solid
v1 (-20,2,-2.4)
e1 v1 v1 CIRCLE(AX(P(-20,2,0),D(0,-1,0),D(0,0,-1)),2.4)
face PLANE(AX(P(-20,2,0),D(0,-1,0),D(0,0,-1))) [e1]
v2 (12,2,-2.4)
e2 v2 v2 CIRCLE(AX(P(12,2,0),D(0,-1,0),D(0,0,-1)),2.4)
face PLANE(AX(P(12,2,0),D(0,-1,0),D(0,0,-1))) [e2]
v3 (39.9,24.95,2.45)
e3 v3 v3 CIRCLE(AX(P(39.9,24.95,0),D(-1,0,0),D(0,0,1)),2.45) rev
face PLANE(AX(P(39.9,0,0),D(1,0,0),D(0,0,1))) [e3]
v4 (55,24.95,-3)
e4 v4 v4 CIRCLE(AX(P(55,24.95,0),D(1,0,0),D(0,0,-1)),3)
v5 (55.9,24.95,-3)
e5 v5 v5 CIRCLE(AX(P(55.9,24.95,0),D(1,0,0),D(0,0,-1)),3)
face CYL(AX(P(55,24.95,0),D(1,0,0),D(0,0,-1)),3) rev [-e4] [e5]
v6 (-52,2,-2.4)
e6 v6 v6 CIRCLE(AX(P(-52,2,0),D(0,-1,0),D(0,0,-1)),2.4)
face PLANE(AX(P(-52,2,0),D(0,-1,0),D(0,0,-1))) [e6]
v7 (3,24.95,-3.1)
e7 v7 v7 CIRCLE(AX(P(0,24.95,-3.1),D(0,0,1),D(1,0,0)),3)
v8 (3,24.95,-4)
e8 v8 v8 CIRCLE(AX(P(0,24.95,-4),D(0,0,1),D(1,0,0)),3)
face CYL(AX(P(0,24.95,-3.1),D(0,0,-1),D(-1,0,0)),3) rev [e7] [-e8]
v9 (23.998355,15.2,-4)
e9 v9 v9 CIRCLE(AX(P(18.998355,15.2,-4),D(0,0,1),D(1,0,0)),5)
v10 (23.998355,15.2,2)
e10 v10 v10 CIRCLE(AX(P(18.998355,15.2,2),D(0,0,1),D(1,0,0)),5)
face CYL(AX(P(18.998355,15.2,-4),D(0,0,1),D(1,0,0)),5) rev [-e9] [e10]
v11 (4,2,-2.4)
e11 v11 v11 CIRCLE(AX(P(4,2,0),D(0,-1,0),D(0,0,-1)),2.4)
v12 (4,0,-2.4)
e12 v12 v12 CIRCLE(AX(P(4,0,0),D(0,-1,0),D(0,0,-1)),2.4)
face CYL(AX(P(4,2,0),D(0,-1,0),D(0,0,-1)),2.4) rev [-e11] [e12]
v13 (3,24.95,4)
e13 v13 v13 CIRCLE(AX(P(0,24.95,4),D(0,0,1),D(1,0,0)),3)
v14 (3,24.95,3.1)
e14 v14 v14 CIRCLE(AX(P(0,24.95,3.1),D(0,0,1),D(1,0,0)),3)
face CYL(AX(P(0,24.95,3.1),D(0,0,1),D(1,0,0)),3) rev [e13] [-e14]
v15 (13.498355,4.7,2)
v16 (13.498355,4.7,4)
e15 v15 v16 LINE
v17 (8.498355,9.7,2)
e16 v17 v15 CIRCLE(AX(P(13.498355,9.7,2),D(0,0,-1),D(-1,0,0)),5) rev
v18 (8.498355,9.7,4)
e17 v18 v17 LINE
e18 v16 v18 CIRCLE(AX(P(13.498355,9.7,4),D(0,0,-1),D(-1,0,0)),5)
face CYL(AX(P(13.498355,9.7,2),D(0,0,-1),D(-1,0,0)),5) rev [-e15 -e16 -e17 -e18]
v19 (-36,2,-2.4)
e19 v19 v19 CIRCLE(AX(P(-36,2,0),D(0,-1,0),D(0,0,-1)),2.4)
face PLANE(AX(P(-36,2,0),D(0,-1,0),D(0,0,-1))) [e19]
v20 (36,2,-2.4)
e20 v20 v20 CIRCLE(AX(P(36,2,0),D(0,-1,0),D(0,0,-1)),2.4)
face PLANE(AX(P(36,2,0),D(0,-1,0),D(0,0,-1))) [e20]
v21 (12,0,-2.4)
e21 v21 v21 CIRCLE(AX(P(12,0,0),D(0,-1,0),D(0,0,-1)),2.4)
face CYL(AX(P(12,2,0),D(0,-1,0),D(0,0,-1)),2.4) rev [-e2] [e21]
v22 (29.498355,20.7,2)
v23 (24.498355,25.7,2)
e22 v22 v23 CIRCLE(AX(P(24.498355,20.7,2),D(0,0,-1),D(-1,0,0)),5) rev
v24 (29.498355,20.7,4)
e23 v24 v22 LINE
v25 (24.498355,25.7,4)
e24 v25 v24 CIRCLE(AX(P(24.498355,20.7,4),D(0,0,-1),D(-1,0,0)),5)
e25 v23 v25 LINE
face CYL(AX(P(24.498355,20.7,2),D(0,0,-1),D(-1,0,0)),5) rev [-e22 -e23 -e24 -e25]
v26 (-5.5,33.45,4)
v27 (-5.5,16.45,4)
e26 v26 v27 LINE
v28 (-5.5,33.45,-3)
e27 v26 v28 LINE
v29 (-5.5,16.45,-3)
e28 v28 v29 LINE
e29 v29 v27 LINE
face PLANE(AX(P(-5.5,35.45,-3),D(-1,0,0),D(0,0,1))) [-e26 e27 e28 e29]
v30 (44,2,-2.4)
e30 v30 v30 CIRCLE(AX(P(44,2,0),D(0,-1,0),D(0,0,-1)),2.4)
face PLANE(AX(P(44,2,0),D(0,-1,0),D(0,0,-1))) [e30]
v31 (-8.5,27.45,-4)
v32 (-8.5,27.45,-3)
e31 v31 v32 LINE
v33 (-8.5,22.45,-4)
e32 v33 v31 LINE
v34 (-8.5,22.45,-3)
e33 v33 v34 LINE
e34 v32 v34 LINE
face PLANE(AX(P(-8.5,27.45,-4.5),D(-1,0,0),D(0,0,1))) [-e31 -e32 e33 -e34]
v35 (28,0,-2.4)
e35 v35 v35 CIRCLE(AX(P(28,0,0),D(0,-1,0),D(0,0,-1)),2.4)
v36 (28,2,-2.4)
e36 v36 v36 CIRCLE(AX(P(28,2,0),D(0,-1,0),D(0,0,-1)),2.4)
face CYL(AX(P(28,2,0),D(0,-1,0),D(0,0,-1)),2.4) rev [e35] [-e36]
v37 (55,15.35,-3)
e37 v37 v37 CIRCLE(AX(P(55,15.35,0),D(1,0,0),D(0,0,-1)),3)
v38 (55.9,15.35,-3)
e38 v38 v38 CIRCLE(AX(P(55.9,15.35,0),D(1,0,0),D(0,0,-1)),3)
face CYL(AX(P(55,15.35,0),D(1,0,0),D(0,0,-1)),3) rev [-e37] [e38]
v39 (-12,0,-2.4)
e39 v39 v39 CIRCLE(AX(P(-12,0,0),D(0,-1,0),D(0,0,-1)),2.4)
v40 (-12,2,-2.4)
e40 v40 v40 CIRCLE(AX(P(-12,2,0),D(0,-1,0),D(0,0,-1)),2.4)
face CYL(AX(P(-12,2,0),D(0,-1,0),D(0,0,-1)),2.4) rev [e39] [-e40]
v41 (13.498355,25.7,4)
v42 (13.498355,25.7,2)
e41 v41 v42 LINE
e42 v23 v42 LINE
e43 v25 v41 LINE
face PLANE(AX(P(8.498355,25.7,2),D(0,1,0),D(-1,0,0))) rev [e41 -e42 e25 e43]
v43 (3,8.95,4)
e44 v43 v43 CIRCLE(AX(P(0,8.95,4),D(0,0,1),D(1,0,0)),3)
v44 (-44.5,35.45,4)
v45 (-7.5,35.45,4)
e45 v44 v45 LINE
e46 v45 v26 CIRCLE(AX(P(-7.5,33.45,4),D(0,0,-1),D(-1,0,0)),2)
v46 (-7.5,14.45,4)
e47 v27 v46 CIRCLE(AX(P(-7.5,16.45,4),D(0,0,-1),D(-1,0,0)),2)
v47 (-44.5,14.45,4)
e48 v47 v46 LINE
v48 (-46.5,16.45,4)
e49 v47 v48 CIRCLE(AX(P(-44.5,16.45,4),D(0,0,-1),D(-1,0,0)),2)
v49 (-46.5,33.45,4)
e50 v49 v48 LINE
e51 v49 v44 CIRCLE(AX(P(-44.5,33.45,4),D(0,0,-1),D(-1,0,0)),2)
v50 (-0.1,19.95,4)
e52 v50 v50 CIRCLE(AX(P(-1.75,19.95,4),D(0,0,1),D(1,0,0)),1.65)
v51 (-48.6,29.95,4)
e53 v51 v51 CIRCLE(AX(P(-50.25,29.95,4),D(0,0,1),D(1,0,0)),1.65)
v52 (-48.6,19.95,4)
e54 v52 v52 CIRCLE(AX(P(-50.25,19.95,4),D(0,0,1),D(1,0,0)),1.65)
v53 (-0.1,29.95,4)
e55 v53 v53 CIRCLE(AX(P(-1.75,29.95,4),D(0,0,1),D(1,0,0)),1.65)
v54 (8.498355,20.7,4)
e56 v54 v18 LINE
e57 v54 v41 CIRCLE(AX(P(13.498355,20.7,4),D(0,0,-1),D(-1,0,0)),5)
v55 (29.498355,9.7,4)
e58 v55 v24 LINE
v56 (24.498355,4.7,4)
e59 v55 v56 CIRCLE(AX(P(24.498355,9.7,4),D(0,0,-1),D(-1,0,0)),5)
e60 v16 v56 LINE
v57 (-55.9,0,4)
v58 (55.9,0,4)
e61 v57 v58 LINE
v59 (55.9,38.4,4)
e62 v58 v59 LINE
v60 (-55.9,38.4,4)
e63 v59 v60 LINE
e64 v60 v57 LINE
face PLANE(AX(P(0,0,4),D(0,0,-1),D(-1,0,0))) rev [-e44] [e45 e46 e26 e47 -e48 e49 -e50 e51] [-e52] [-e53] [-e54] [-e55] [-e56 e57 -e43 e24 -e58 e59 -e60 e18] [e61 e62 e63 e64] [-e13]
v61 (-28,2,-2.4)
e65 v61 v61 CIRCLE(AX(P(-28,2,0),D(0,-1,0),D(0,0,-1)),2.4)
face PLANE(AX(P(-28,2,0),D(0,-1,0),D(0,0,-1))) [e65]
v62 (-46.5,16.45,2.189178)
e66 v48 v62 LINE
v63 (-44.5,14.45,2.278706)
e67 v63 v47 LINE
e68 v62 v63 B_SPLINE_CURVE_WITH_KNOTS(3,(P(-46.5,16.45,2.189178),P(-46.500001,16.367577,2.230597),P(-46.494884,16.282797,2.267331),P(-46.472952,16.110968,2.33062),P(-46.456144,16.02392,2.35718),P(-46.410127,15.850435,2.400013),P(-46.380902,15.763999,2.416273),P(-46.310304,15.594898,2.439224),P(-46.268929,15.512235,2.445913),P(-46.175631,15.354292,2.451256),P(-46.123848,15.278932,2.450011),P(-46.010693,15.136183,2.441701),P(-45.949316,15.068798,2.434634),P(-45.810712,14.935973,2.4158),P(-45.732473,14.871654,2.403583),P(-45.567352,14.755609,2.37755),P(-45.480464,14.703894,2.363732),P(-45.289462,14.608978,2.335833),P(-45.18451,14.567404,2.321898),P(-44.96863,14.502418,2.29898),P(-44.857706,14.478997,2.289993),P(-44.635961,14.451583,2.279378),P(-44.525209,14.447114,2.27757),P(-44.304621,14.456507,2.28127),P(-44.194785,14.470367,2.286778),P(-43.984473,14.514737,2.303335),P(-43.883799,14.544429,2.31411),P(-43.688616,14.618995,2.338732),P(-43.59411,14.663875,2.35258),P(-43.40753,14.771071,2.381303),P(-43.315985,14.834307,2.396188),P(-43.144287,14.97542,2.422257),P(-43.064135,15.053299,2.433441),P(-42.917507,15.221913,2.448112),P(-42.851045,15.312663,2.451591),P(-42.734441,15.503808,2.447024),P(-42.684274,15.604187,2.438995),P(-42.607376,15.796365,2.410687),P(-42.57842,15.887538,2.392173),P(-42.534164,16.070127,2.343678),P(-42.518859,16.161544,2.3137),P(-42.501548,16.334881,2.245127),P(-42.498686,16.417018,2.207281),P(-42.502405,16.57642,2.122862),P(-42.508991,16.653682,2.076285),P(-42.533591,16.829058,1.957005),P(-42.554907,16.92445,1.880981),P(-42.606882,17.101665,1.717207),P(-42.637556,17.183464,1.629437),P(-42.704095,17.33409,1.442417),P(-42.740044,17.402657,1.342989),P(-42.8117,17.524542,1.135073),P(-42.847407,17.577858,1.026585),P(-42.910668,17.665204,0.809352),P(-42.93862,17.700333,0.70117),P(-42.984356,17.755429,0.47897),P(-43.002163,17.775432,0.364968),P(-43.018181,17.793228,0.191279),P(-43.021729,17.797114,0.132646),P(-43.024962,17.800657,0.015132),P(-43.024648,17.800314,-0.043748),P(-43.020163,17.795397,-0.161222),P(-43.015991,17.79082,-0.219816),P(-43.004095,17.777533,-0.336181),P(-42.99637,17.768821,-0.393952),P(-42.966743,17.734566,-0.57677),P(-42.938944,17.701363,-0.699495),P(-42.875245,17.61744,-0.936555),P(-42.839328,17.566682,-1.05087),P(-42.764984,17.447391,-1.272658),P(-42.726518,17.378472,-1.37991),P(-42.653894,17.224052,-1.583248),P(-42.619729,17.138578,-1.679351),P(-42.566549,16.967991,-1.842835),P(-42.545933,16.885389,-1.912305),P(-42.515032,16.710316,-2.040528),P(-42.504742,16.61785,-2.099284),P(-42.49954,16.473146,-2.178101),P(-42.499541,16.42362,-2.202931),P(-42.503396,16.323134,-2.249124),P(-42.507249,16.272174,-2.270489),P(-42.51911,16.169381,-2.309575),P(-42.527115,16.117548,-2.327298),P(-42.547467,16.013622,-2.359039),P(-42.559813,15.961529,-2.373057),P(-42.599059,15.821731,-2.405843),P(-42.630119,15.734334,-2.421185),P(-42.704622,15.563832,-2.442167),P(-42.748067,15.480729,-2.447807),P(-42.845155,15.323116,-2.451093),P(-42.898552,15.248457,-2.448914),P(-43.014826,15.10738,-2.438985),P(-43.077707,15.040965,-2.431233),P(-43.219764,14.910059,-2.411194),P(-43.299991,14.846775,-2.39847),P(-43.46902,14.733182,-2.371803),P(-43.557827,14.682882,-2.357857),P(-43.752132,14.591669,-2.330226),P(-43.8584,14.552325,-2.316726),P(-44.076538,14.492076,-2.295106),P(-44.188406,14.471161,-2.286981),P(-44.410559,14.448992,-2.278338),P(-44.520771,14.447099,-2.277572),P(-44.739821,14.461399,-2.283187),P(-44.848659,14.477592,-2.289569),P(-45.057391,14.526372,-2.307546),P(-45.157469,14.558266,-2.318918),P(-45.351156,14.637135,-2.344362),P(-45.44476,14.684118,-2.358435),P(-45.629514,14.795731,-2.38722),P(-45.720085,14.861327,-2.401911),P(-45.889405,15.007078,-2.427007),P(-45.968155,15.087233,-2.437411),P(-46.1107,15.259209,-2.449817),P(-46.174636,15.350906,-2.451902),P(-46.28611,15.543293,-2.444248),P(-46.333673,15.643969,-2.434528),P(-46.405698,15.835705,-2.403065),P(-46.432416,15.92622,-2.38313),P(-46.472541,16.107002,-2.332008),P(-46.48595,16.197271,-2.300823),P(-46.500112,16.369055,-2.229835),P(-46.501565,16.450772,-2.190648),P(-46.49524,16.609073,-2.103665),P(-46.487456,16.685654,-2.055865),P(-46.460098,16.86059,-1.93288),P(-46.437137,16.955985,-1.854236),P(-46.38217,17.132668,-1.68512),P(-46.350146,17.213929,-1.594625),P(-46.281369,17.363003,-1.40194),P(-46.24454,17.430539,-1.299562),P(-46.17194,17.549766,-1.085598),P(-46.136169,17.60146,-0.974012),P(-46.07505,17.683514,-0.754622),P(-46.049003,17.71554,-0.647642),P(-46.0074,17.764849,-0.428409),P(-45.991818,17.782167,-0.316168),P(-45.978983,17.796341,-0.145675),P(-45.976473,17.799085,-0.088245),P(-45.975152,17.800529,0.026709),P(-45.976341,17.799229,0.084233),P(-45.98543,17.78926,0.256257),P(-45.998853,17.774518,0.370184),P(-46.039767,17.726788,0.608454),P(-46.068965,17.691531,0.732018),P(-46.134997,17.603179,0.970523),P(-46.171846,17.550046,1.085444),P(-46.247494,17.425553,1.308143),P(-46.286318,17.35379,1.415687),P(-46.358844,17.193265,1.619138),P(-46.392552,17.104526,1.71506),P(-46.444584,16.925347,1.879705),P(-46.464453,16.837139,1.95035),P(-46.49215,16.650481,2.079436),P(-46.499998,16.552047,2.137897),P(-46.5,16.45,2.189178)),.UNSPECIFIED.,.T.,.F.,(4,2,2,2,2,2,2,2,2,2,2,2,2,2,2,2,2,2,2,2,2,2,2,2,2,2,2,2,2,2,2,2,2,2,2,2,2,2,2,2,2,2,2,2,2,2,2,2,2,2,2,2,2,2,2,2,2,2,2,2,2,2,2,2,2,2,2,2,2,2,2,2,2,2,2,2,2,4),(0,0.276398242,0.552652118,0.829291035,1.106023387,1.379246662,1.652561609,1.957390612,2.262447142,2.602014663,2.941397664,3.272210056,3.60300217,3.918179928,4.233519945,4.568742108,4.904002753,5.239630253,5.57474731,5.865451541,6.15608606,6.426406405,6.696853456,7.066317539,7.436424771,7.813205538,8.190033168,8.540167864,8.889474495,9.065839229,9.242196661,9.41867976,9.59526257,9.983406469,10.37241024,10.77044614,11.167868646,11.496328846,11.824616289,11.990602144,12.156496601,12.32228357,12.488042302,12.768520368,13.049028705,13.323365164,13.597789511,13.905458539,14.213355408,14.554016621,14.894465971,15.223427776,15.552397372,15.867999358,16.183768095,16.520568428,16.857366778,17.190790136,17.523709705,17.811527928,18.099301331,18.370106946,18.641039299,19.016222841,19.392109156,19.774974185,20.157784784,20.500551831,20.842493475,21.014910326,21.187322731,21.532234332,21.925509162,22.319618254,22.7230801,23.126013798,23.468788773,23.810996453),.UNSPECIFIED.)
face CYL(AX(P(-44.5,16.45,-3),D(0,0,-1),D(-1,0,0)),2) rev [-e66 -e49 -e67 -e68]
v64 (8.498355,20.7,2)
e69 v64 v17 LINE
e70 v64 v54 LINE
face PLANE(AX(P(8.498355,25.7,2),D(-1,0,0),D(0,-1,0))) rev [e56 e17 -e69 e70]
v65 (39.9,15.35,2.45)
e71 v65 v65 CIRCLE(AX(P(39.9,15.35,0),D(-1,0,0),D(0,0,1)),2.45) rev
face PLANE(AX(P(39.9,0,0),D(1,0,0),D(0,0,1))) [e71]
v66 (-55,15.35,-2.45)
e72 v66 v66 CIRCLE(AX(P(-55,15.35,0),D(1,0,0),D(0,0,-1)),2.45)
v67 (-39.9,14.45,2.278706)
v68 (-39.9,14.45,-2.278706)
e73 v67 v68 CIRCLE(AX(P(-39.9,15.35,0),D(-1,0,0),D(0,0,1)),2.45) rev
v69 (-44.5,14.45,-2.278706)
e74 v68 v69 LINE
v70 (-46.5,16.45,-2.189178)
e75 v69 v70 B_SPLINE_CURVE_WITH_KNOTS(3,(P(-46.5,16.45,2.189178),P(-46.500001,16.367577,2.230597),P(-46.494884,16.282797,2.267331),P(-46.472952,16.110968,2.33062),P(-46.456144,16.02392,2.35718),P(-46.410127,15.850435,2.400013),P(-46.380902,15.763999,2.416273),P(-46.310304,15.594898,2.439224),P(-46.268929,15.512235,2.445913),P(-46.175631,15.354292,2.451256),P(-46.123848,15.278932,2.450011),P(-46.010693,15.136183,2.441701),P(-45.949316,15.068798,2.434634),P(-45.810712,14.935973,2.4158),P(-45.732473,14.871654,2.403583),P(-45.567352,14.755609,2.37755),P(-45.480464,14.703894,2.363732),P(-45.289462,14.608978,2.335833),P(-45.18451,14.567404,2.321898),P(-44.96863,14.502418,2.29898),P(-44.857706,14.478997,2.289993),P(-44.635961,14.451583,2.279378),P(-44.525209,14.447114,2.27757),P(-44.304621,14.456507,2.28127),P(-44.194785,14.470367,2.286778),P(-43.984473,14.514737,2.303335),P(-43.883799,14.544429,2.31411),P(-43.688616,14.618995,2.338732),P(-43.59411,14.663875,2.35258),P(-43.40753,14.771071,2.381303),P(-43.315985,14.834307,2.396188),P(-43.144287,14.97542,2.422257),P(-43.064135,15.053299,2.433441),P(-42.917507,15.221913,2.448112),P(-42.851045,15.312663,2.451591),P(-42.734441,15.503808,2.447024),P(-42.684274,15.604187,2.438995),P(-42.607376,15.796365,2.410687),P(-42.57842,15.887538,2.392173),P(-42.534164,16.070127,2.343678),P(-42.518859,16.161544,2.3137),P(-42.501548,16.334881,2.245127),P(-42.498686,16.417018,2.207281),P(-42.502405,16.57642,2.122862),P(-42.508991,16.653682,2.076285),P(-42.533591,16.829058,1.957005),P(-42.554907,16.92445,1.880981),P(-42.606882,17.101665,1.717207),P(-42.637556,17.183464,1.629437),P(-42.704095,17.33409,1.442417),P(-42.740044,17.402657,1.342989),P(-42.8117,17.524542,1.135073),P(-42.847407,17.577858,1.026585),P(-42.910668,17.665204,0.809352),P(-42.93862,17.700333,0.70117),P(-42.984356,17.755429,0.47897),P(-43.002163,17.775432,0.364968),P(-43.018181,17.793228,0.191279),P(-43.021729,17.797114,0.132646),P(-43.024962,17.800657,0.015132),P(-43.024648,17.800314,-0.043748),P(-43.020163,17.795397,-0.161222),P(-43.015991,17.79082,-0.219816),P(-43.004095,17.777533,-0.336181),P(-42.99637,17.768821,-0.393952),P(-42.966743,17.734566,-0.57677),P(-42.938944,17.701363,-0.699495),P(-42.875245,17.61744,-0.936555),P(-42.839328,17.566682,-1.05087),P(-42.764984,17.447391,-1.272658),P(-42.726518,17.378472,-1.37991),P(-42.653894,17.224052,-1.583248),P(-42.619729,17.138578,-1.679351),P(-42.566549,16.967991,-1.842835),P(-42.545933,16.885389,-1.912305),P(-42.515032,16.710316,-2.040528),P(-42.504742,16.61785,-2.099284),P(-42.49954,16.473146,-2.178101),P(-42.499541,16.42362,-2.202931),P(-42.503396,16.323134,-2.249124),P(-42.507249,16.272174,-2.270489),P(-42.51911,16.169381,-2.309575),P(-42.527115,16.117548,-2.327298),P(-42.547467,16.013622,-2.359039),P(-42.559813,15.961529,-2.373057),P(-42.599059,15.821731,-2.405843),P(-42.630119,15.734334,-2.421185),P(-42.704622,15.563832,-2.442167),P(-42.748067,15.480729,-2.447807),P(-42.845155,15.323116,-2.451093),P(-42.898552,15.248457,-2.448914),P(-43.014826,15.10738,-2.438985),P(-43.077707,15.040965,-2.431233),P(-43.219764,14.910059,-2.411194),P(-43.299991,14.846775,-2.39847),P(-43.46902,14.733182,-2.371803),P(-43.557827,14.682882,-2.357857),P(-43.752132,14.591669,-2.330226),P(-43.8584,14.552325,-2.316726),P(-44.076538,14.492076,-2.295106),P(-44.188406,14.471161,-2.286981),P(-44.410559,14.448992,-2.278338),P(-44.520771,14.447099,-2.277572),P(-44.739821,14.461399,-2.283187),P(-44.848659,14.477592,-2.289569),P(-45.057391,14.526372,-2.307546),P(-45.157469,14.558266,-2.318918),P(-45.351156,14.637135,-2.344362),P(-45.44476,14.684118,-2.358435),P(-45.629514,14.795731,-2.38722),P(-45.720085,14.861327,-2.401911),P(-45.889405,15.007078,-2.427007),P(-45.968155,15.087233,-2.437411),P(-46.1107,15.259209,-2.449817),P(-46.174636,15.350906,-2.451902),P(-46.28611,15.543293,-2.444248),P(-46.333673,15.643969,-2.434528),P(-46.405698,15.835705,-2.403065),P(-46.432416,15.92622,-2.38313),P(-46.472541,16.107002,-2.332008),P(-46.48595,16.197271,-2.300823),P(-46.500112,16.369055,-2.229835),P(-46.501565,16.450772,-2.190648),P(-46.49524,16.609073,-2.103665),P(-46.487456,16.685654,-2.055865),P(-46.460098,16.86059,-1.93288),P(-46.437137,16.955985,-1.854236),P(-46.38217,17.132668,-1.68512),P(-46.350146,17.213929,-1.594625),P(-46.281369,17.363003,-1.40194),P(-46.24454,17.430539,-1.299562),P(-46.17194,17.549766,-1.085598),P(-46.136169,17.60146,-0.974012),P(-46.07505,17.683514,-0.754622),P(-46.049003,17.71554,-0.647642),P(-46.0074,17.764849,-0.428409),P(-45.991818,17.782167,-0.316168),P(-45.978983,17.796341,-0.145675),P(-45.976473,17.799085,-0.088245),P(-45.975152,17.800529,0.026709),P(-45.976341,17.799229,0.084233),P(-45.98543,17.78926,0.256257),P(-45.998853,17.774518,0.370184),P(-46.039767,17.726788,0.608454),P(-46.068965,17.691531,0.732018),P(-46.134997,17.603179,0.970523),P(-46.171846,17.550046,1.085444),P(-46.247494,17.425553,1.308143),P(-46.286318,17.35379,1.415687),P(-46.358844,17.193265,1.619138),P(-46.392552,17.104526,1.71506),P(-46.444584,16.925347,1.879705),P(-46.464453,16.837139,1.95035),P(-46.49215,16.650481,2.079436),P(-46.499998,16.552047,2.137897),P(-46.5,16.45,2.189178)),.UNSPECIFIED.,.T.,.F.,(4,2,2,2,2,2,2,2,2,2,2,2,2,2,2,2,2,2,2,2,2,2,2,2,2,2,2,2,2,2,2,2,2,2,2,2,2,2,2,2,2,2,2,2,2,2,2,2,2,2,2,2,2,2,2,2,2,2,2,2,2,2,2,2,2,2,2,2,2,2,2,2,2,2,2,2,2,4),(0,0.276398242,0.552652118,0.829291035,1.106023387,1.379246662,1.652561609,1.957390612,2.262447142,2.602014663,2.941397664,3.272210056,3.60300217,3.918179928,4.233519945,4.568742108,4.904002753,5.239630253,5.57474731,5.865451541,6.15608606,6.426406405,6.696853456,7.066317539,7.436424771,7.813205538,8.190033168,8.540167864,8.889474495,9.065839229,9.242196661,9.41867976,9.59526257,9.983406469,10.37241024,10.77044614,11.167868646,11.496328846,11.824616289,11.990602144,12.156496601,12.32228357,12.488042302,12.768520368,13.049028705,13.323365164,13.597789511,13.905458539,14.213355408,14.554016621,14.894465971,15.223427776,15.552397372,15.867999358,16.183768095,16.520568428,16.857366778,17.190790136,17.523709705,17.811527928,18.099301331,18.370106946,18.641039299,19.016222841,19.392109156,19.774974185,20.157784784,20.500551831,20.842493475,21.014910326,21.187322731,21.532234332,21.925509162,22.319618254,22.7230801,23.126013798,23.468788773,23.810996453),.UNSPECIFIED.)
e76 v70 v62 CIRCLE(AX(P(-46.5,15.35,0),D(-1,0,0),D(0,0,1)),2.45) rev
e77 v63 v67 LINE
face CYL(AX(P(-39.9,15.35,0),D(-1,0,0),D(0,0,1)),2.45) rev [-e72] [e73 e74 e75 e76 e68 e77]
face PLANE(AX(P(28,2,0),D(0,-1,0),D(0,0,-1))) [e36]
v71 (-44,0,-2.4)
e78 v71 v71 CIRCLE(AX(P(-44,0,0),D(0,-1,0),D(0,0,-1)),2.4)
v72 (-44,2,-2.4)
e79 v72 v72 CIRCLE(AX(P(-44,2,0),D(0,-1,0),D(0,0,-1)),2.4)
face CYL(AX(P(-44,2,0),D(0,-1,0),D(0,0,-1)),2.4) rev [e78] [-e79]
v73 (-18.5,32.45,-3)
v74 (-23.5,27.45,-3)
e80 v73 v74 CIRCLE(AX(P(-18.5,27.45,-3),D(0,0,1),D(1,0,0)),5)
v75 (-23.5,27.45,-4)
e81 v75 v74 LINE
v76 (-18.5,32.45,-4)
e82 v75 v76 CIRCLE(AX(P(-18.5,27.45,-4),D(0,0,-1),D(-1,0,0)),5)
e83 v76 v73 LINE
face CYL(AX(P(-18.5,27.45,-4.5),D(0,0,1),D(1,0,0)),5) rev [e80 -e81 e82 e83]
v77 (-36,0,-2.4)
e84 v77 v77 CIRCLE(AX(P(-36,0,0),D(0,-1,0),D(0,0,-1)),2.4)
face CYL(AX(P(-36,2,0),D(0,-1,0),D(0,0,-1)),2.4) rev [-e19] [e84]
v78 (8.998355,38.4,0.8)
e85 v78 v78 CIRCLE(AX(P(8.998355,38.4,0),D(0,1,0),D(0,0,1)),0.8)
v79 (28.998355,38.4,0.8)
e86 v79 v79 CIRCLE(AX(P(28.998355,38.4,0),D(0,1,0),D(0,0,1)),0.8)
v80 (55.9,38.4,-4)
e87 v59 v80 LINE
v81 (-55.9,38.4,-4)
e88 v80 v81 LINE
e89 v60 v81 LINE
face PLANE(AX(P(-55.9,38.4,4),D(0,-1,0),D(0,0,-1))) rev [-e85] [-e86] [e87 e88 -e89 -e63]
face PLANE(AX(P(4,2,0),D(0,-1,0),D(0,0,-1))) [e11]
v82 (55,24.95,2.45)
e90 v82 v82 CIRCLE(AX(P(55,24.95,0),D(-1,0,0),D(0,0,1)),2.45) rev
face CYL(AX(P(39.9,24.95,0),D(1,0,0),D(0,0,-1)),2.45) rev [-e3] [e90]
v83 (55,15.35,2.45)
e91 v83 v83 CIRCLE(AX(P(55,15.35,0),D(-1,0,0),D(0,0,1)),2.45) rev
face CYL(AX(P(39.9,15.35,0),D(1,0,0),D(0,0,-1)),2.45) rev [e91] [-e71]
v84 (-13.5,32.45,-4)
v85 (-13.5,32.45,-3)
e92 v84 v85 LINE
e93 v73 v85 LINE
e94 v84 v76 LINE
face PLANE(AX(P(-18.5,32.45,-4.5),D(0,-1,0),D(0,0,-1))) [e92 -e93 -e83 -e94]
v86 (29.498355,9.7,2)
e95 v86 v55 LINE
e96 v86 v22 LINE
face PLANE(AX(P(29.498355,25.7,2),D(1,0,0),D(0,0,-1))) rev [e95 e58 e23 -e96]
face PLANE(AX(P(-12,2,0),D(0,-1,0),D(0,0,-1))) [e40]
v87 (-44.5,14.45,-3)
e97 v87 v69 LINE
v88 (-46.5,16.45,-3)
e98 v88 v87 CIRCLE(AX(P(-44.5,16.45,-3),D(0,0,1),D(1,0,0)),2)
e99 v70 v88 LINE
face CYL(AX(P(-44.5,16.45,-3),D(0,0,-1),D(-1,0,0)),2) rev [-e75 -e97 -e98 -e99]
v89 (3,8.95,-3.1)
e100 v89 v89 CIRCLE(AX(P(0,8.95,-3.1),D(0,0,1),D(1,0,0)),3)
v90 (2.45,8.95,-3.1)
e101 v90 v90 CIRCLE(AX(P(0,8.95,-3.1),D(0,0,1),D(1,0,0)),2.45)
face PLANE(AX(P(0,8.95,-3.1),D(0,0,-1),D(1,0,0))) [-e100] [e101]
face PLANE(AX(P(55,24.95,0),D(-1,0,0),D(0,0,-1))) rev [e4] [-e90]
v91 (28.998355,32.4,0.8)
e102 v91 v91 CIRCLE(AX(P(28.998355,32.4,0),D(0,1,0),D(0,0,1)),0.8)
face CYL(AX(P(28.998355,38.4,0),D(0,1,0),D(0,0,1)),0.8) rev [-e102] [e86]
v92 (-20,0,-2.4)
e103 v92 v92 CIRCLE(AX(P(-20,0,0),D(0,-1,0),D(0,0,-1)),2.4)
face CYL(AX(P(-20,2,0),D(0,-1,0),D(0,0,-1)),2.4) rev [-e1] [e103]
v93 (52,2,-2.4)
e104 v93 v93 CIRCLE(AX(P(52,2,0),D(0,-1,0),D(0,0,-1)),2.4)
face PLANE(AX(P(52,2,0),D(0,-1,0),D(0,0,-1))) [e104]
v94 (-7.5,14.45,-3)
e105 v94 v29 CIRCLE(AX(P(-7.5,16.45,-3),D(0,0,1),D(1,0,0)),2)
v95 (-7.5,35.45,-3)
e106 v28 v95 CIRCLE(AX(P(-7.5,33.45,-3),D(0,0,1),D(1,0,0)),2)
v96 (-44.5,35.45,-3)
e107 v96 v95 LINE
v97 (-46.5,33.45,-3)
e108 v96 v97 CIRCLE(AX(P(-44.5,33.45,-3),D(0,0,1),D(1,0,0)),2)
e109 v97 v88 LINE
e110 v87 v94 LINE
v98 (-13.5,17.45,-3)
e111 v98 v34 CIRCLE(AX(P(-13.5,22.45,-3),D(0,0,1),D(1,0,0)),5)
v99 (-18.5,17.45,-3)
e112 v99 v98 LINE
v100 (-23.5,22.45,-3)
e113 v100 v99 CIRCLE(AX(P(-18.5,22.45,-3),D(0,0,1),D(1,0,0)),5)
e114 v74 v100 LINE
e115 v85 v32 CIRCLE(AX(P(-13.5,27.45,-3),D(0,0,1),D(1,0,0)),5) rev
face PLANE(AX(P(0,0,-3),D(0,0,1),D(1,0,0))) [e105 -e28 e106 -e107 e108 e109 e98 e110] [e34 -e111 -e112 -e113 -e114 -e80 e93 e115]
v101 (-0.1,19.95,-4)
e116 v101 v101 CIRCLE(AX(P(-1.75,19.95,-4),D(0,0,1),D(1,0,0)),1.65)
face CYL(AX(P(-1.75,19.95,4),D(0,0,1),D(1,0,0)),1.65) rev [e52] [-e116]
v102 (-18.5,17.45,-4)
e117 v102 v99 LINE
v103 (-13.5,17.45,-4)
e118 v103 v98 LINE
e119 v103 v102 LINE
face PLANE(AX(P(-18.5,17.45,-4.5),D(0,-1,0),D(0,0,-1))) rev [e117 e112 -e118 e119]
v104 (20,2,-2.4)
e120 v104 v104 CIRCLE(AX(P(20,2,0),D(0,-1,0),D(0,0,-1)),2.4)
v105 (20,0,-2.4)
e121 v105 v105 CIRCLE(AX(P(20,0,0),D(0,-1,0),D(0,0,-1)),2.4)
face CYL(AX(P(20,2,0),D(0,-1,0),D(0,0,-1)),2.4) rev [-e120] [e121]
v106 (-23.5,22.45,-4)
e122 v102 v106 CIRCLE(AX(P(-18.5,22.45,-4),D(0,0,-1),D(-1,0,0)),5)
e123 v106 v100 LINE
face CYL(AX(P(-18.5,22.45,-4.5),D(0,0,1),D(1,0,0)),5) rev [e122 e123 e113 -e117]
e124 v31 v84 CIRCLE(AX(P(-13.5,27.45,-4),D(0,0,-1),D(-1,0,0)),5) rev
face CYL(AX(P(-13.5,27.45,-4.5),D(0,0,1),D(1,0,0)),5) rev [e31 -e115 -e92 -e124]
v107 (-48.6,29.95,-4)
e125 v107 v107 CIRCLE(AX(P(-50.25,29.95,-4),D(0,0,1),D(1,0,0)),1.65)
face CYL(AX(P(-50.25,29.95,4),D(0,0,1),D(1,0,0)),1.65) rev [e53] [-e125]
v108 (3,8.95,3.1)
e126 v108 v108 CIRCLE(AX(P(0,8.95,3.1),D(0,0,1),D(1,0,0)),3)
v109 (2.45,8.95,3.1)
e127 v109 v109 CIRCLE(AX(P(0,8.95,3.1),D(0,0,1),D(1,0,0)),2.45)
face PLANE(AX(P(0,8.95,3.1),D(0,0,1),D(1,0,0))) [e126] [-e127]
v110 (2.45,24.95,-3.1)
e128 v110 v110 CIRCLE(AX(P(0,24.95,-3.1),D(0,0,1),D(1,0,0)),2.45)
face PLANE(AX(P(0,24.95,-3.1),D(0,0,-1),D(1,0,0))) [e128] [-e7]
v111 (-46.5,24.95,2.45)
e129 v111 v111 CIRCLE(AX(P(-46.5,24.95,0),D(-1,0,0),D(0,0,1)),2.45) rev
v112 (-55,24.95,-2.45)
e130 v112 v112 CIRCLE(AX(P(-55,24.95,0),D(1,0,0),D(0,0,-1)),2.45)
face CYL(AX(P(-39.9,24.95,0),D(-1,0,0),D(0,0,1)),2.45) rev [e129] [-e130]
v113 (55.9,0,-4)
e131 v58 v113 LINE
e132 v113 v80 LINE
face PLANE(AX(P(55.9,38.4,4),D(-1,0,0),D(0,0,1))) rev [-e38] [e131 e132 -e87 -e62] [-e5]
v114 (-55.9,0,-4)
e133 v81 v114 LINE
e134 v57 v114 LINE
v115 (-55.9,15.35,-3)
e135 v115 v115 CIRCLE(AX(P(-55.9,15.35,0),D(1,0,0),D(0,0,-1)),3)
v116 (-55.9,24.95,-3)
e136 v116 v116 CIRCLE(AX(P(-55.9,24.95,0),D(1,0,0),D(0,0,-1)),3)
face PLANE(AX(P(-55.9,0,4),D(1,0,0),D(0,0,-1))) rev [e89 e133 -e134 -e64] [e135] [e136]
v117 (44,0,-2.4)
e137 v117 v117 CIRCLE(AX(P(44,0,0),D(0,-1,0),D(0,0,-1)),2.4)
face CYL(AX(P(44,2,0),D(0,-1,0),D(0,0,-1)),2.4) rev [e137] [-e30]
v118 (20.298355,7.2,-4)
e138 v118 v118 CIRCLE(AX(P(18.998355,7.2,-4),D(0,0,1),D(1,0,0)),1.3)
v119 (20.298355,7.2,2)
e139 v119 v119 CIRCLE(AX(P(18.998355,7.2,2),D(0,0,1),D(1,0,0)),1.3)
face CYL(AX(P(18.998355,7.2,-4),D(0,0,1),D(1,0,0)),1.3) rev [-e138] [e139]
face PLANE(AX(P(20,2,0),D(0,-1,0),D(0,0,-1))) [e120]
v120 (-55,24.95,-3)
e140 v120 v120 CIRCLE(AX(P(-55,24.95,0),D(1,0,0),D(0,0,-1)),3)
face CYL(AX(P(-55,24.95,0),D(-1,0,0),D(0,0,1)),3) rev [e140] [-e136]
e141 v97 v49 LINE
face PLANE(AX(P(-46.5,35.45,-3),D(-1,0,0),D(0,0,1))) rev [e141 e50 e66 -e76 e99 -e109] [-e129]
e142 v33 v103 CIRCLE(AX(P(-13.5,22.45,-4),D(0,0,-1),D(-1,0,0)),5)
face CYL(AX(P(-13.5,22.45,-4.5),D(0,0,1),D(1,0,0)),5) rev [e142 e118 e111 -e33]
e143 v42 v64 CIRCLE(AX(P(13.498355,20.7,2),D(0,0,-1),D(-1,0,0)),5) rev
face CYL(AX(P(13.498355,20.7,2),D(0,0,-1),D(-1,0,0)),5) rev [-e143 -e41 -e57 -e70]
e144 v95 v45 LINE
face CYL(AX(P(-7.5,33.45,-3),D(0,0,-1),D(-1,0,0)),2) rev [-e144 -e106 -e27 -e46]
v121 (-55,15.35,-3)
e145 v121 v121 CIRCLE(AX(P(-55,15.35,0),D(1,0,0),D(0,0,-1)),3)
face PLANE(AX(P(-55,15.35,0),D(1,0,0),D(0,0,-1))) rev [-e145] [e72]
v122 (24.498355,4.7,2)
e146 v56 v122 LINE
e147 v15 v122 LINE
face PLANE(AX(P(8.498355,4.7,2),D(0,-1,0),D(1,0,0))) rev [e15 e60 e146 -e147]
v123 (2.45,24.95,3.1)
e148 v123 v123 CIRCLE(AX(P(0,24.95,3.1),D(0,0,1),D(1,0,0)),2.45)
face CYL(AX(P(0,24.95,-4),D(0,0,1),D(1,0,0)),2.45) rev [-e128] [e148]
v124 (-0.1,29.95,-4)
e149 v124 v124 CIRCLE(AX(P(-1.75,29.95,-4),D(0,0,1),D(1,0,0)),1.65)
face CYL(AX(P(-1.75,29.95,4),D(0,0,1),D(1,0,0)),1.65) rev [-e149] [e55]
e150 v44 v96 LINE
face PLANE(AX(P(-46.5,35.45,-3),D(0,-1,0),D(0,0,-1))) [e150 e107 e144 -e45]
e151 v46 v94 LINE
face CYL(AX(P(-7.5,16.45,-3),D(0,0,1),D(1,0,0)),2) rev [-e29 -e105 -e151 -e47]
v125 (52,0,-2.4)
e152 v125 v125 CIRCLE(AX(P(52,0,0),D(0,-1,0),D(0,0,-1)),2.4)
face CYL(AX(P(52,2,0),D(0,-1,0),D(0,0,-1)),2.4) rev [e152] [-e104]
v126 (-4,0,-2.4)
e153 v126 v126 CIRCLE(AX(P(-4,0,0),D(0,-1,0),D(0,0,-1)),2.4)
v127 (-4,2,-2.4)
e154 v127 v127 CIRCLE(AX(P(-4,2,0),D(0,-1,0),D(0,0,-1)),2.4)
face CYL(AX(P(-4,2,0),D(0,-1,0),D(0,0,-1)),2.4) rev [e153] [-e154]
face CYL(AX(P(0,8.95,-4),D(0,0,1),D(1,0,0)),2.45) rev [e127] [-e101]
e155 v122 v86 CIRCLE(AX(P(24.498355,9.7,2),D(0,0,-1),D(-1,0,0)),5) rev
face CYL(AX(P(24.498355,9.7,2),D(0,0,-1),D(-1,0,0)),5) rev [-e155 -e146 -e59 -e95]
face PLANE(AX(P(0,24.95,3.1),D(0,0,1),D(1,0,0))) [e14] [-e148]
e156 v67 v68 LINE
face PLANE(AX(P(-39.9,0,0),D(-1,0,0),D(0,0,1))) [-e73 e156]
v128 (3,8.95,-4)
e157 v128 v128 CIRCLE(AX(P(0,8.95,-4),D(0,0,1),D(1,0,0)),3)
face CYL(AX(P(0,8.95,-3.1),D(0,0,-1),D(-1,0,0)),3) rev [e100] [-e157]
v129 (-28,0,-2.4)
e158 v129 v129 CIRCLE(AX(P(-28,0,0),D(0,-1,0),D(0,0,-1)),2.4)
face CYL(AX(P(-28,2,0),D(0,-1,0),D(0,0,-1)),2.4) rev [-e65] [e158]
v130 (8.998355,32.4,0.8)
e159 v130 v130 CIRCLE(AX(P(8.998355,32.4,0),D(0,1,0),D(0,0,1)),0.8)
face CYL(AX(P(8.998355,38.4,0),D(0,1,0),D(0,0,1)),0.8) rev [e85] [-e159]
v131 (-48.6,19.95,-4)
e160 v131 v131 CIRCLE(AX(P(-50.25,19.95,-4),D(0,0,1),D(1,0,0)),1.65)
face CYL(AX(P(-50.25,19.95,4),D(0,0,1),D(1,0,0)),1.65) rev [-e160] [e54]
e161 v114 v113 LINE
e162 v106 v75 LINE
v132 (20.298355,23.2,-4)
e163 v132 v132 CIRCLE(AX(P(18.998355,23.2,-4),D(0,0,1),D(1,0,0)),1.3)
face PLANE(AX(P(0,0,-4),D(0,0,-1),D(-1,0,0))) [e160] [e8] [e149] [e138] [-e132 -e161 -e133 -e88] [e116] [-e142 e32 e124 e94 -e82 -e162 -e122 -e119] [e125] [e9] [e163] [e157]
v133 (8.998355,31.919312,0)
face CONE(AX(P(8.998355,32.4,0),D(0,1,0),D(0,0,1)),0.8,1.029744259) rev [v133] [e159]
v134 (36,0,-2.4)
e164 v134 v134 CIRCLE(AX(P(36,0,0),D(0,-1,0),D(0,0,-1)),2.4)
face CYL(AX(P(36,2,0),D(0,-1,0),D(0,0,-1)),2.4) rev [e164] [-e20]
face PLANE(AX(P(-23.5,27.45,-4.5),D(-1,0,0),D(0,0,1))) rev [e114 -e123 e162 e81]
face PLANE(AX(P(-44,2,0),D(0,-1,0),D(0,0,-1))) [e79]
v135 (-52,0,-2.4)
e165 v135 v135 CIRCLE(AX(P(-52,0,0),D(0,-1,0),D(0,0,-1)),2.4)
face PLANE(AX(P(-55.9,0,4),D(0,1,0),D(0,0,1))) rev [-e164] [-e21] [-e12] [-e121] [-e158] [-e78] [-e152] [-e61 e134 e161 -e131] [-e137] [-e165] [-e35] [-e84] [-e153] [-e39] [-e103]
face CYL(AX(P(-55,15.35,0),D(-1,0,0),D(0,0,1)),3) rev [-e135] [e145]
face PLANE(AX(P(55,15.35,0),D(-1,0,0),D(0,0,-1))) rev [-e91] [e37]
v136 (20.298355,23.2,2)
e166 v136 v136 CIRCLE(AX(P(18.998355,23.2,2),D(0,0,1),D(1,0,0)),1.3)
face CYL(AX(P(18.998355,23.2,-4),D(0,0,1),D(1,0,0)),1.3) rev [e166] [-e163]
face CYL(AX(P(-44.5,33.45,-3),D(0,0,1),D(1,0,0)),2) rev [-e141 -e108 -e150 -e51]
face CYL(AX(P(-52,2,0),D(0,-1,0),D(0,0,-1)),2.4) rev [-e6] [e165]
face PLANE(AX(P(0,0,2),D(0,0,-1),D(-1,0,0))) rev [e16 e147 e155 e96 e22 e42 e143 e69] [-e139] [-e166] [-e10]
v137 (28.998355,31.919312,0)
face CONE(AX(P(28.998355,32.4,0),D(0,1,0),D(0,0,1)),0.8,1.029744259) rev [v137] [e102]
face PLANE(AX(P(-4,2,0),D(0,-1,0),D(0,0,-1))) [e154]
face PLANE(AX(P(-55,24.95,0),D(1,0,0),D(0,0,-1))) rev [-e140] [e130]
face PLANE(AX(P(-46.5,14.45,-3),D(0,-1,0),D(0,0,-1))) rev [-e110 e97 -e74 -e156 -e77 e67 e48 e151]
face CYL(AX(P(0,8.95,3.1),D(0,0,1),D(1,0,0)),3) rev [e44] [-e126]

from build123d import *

# Parameters (mm, degrees)
SKIZZE1_W                        = 111.8
SKIZZE1_H                        = 38.4
AUFSATZ_LINEAR_AUSTRAGEN1_DEPTH  = 4
SKIZZE2_R                        = 2.4
SCHNITT_LINEAR_AUSTRAGEN1_DEPTH  = 2
LINEARES_MUSTER1_COUNT           = 20
LINEARES_MUSTER1_PITCH           = 8
SKIZZE3_R                        = 2.45
SCHNITT_LINEAR_AUSTRAGEN2_DEPTH  = 69.288871714
SKIZZE3_3_R                      = 3
SKIZZE3_3_R_2                    = 2.45
SCHNITT_LINEAR_AUSTRAGEN3_DEPTH  = 0.9
SKIZZE4_2_R                      = 5
SKIZZE4_2_R_2                    = 1.3
SCHNITT_LINEAR_AUSTRAGEN5_DEPTH  = 69.288871714
SKIZZE4_W                        = 21
SKIZZE4_H                        = 21
SKIZZE4_R                        = 5
SKIZZE4_R_2                      = 1.3
SCHNITT_LINEAR_AUSTRAGEN4_DEPTH  = 2
SKIZZE5_R                        = 4.5
SCHNITT_LINEAR_AUSTRAGEN6_DEPTH  = 69.288871714
SKIZZE5_3_W                      = 41
SKIZZE5_3_H                      = 21
SCHNITT_LINEAR_AUSTRAGEN7_DEPTH  = 7
LOCH_MUSTER_START                = -4
LOCH_MUSTER_OUTLINE_R            = 2.45
LOCH_MUSTER_DEPTH                = 8
LOCH_MUSTER_2_OUTLINE_R          = 3
LOCH_MUSTER_2_OUTLINE_R_2        = 2.45
LOCH_MUSTER_2_DEPTH              = 0.9
LOCH_MUSTER_START_2              = 3.1
LOCH_MUSTER_3_OUTLINE_R          = 3
LOCH_MUSTER_3_OUTLINE_R_2        = 2.45
LOCH_MUSTER_3_DEPTH              = 0.9
FR_SER_10_R                      = 5
FR_SER_4_R                       = 2
M4_GEWINDEBOHRUNG1_D             = 3.3
SCHNITT_LINEAR_AUSTRAGEN8_DEPTH  = 8.5
SKIZZE10_R                       = 2.45
SCHNITT_LINEAR_AUSTRAGEN9_DEPTH  = 16
SKIZZE10_3_R                     = 3
SCHNITT_LINEAR_AUSTRAGEN10_DEPTH = 0.9
M2_GEWINDEBOHRUNG1_D             = 1.6
M2_GEWINDEBOHRUNG1_DEPTH         = 6
M2_GEWINDEBOHRUNG1_TIP           = 0.480688495


# Read off the part's stored shape, not the designer's step: Loch-Muster
with BuildPart() as part:
    # Skizze1 → Aufsatz-Linear austragen1 (new, symmetric)
    with BuildSketch(Plane.XY):
        with Locations((0, 19.2)):
            Rectangle(SKIZZE1_W, SKIZZE1_H)
    extrude(amount=AUFSATZ_LINEAR_AUSTRAGEN1_DEPTH, both=True)

    # Skizze2 → Schnitt-Linear austragen1 (cut)
    with BuildSketch(Plane.XZ):
        with Locations(Location((-52, 0, 0), (0, 0, 270))):
            Circle(SKIZZE2_R)
    schnitt_linear_austragen1 = extrude(amount=-SCHNITT_LINEAR_AUSTRAGEN1_DEPTH, mode=Mode.SUBTRACT)

    # Lineares Muster1: Schnitt-Linear austragen1 ×20
    with Locations(*[(i * LINEARES_MUSTER1_PITCH, 0, 0) for i in range(1, LINEARES_MUSTER1_COUNT)]):
        add(schnitt_linear_austragen1, mode=Mode.SUBTRACT)

    # Skizze3 → Schnitt-Linear austragen2 (cut, through all)
    with BuildSketch(Plane.XY.offset(4)):
        with Locations((0, 8.95)):
            Circle(SKIZZE3_R)
    extrude(amount=-SCHNITT_LINEAR_AUSTRAGEN2_DEPTH, mode=Mode.SUBTRACT)

    # Skizze3<3> → Schnitt-Linear austragen3 (cut)
    with BuildSketch(Plane.XY.offset(4)):
        with Locations((0, 8.95)):
            Circle(SKIZZE3_3_R)
        with Locations((0, 8.95)):
            Circle(SKIZZE3_3_R_2, mode=Mode.SUBTRACT)
    schnitt_linear_austragen3 = extrude(amount=-SCHNITT_LINEAR_AUSTRAGEN3_DEPTH, mode=Mode.SUBTRACT)

    # Spiegeln1: Schnitt-Linear austragen3 across plane
    add(schnitt_linear_austragen3.mirror(Plane.XY), mode=Mode.SUBTRACT)

    # Skizze4<2> → Schnitt-Linear austragen5 (cut, through all)
    with BuildSketch(Plane.XY.offset(4)):
        with Locations((18.998355192, 15.2)):
            Circle(SKIZZE4_2_R)
        with Locations((18.998355192, 23.2)):
            Circle(SKIZZE4_2_R_2)
        with Locations((18.998355192, 7.2)):
            Circle(SKIZZE4_2_R_2)
    extrude(amount=-SCHNITT_LINEAR_AUSTRAGEN5_DEPTH, mode=Mode.SUBTRACT)

    # Skizze4 → Schnitt-Linear austragen4 (cut)
    with BuildSketch(Plane.XY.offset(4)):
        with Locations((18.998355192, 15.2)):
            Rectangle(SKIZZE4_W, SKIZZE4_H)
        with Locations((18.998355192, 15.2)):
            Circle(SKIZZE4_R, mode=Mode.SUBTRACT)
        with Locations((18.998355192, 23.2)):
            Circle(SKIZZE4_R_2, mode=Mode.SUBTRACT)
        with Locations((18.998355192, 7.2)):
            Circle(SKIZZE4_R_2, mode=Mode.SUBTRACT)
    extrude(amount=-SCHNITT_LINEAR_AUSTRAGEN4_DEPTH, mode=Mode.SUBTRACT)

    # Skizze5 → Schnitt-Linear austragen6 (cut, through all)
    with BuildSketch(Plane.XY.offset(4)):
        with Locations((-16, 24.95)):
            Circle(SKIZZE5_R)
    extrude(amount=-SCHNITT_LINEAR_AUSTRAGEN6_DEPTH, mode=Mode.SUBTRACT)

    # Skizze5<3> → Schnitt-Linear austragen7 (cut)
    with BuildSketch(Plane.XY.offset(4)):
        with Locations((-26, 24.95)):
            Rectangle(SKIZZE5_3_W, SKIZZE5_3_H)
    extrude(amount=-SCHNITT_LINEAR_AUSTRAGEN7_DEPTH, mode=Mode.SUBTRACT)

    # Loch-Muster outline → Loch-Muster (cut)
    with BuildSketch(Plane.XY.offset(LOCH_MUSTER_START)):
        with Locations((0, 24.95)):
            Circle(LOCH_MUSTER_OUTLINE_R)
    extrude(amount=LOCH_MUSTER_DEPTH, mode=Mode.SUBTRACT)

    # Loch-Muster 2 outline → Loch-Muster 2 (cut)
    with BuildSketch(Plane.XY.offset(LOCH_MUSTER_START)):
        with Locations((0, 24.95)):
            Circle(LOCH_MUSTER_2_OUTLINE_R)
        with Locations((0, 24.95)):
            Circle(LOCH_MUSTER_2_OUTLINE_R_2, mode=Mode.SUBTRACT)
    extrude(amount=LOCH_MUSTER_2_DEPTH, mode=Mode.SUBTRACT)

    # Loch-Muster 3 outline → Loch-Muster 3 (cut)
    with BuildSketch(Plane.XY.offset(LOCH_MUSTER_START_2)):
        with Locations((0, 24.95)):
            Circle(LOCH_MUSTER_3_OUTLINE_R)
        with Locations((0, 24.95)):
            Circle(LOCH_MUSTER_3_OUTLINE_R_2, mode=Mode.SUBTRACT)
    extrude(amount=LOCH_MUSTER_3_DEPTH, mode=Mode.SUBTRACT)

    # Fräser 10
    fr_ser_10_edges = [part.edges().sort_by_distance(p)[0] for p in [
        (8.498355192, 25.7, 3),
        (29.498355192, 25.7, 3),
        (29.498355192, 4.7, 3),
        (8.498355192, 4.7, 3),
    ]]
    fillet(fr_ser_10_edges, radius=FR_SER_10_R)

    # Fräser 4
    fr_ser_4_edges = [part.edges().sort_by_distance(p)[0] for p in [
        (-46.5, 14.45, 0.5),
        (-46.5, 35.45, 0.5),
        (-5.5, 35.45, 0.5),
        (-5.5, 14.45, 0.5),
    ]]
    fillet(fr_ser_4_edges, radius=FR_SER_4_R)

    # M4 Gewindebohrung1 (through all)
    with Locations(Plane.XY.offset(4)):
        with Locations((-50.25, 29.95), (-50.25, 19.95), (-1.75, 19.95), (-1.75, 29.95)):
            Hole(M4_GEWINDEBOHRUNG1_D / 2)

    # Skizze5<4> → Schnitt-Linear austragen8 (cut)
    with BuildSketch(Plane.XY.offset(4)):
        with BuildLine():
            Line((-18.5, 32.45), (-13.5, 32.45))
            ThreePointArc((-13.5, 32.45), (-9.964466094, 30.985533906), (-8.5, 27.45))
            Line((-8.5, 27.45), (-8.5, 22.45))
            ThreePointArc((-8.5, 22.45), (-9.964466094, 18.914466094), (-13.5, 17.45))
            Line((-13.5, 17.45), (-18.5, 17.45))
            ThreePointArc((-18.5, 17.45), (-22.035533906, 18.914466094), (-23.5, 22.45))
            Line((-23.5, 22.45), (-23.5, 27.45))
            ThreePointArc((-23.5, 27.45), (-22.035533906, 30.985533906), (-18.5, 32.45))
        make_face()
    extrude(amount=-SCHNITT_LINEAR_AUSTRAGEN8_DEPTH, mode=Mode.SUBTRACT)

    # Skizze10 → Schnitt-Linear austragen9 (cut)
    with BuildSketch(Plane(origin=(-55.9, 0, 0), x_dir=(0, 0, -1), z_dir=(1, 0, 0))):
        with Locations(Location((0, 15.35, 0), (0, 0, 180))):
            Circle(SKIZZE10_R)
        with Locations(Location((0, 24.95, 0), (0, 0, 180))):
            Circle(SKIZZE10_R)
    schnitt_linear_austragen9 = extrude(amount=SCHNITT_LINEAR_AUSTRAGEN9_DEPTH, mode=Mode.SUBTRACT)

    # Skizze10<3> → Schnitt-Linear austragen10 (cut)
    with BuildSketch(Plane(origin=(-55.9, 0, 0), x_dir=(0, 0, -1), z_dir=(1, 0, 0))):
        with Locations((0, 15.35)):
            Circle(SKIZZE10_3_R)
        with Locations((0, 24.95)):
            Circle(SKIZZE10_3_R)
    schnitt_linear_austragen10 = extrude(amount=SCHNITT_LINEAR_AUSTRAGEN10_DEPTH, mode=Mode.SUBTRACT)

    # Spiegeln2: Schnitt-Linear austragen9, Schnitt-Linear austragen10 across plane
    add(schnitt_linear_austragen9.mirror(Plane(origin=(0, 0, 0), x_dir=(0, 0, 1), z_dir=(1, 0, 0))), mode=Mode.SUBTRACT)
    add(schnitt_linear_austragen10.mirror(Plane(origin=(0, 0, 0), x_dir=(0, 0, 1), z_dir=(1, 0, 0))), mode=Mode.SUBTRACT)

    # M2 Gewindebohrung1
    with Locations(Plane(origin=(0, 38.4, 0), x_dir=(1, 0, 0), z_dir=(0, 1, 0))):
        with Locations((28.998355192, 0), (8.998355192, 0)):
            Hole(M2_GEWINDEBOHRUNG1_D / 2, depth=M2_GEWINDEBOHRUNG1_DEPTH)
            with Locations((0, 0, -(M2_GEWINDEBOHRUNG1_DEPTH + M2_GEWINDEBOHRUNG1_TIP / 2))):  # 118° drill point
                Cone(0, M2_GEWINDEBOHRUNG1_D / 2, M2_GEWINDEBOHRUNG1_TIP, mode=Mode.SUBTRACT)


solid = part.part
